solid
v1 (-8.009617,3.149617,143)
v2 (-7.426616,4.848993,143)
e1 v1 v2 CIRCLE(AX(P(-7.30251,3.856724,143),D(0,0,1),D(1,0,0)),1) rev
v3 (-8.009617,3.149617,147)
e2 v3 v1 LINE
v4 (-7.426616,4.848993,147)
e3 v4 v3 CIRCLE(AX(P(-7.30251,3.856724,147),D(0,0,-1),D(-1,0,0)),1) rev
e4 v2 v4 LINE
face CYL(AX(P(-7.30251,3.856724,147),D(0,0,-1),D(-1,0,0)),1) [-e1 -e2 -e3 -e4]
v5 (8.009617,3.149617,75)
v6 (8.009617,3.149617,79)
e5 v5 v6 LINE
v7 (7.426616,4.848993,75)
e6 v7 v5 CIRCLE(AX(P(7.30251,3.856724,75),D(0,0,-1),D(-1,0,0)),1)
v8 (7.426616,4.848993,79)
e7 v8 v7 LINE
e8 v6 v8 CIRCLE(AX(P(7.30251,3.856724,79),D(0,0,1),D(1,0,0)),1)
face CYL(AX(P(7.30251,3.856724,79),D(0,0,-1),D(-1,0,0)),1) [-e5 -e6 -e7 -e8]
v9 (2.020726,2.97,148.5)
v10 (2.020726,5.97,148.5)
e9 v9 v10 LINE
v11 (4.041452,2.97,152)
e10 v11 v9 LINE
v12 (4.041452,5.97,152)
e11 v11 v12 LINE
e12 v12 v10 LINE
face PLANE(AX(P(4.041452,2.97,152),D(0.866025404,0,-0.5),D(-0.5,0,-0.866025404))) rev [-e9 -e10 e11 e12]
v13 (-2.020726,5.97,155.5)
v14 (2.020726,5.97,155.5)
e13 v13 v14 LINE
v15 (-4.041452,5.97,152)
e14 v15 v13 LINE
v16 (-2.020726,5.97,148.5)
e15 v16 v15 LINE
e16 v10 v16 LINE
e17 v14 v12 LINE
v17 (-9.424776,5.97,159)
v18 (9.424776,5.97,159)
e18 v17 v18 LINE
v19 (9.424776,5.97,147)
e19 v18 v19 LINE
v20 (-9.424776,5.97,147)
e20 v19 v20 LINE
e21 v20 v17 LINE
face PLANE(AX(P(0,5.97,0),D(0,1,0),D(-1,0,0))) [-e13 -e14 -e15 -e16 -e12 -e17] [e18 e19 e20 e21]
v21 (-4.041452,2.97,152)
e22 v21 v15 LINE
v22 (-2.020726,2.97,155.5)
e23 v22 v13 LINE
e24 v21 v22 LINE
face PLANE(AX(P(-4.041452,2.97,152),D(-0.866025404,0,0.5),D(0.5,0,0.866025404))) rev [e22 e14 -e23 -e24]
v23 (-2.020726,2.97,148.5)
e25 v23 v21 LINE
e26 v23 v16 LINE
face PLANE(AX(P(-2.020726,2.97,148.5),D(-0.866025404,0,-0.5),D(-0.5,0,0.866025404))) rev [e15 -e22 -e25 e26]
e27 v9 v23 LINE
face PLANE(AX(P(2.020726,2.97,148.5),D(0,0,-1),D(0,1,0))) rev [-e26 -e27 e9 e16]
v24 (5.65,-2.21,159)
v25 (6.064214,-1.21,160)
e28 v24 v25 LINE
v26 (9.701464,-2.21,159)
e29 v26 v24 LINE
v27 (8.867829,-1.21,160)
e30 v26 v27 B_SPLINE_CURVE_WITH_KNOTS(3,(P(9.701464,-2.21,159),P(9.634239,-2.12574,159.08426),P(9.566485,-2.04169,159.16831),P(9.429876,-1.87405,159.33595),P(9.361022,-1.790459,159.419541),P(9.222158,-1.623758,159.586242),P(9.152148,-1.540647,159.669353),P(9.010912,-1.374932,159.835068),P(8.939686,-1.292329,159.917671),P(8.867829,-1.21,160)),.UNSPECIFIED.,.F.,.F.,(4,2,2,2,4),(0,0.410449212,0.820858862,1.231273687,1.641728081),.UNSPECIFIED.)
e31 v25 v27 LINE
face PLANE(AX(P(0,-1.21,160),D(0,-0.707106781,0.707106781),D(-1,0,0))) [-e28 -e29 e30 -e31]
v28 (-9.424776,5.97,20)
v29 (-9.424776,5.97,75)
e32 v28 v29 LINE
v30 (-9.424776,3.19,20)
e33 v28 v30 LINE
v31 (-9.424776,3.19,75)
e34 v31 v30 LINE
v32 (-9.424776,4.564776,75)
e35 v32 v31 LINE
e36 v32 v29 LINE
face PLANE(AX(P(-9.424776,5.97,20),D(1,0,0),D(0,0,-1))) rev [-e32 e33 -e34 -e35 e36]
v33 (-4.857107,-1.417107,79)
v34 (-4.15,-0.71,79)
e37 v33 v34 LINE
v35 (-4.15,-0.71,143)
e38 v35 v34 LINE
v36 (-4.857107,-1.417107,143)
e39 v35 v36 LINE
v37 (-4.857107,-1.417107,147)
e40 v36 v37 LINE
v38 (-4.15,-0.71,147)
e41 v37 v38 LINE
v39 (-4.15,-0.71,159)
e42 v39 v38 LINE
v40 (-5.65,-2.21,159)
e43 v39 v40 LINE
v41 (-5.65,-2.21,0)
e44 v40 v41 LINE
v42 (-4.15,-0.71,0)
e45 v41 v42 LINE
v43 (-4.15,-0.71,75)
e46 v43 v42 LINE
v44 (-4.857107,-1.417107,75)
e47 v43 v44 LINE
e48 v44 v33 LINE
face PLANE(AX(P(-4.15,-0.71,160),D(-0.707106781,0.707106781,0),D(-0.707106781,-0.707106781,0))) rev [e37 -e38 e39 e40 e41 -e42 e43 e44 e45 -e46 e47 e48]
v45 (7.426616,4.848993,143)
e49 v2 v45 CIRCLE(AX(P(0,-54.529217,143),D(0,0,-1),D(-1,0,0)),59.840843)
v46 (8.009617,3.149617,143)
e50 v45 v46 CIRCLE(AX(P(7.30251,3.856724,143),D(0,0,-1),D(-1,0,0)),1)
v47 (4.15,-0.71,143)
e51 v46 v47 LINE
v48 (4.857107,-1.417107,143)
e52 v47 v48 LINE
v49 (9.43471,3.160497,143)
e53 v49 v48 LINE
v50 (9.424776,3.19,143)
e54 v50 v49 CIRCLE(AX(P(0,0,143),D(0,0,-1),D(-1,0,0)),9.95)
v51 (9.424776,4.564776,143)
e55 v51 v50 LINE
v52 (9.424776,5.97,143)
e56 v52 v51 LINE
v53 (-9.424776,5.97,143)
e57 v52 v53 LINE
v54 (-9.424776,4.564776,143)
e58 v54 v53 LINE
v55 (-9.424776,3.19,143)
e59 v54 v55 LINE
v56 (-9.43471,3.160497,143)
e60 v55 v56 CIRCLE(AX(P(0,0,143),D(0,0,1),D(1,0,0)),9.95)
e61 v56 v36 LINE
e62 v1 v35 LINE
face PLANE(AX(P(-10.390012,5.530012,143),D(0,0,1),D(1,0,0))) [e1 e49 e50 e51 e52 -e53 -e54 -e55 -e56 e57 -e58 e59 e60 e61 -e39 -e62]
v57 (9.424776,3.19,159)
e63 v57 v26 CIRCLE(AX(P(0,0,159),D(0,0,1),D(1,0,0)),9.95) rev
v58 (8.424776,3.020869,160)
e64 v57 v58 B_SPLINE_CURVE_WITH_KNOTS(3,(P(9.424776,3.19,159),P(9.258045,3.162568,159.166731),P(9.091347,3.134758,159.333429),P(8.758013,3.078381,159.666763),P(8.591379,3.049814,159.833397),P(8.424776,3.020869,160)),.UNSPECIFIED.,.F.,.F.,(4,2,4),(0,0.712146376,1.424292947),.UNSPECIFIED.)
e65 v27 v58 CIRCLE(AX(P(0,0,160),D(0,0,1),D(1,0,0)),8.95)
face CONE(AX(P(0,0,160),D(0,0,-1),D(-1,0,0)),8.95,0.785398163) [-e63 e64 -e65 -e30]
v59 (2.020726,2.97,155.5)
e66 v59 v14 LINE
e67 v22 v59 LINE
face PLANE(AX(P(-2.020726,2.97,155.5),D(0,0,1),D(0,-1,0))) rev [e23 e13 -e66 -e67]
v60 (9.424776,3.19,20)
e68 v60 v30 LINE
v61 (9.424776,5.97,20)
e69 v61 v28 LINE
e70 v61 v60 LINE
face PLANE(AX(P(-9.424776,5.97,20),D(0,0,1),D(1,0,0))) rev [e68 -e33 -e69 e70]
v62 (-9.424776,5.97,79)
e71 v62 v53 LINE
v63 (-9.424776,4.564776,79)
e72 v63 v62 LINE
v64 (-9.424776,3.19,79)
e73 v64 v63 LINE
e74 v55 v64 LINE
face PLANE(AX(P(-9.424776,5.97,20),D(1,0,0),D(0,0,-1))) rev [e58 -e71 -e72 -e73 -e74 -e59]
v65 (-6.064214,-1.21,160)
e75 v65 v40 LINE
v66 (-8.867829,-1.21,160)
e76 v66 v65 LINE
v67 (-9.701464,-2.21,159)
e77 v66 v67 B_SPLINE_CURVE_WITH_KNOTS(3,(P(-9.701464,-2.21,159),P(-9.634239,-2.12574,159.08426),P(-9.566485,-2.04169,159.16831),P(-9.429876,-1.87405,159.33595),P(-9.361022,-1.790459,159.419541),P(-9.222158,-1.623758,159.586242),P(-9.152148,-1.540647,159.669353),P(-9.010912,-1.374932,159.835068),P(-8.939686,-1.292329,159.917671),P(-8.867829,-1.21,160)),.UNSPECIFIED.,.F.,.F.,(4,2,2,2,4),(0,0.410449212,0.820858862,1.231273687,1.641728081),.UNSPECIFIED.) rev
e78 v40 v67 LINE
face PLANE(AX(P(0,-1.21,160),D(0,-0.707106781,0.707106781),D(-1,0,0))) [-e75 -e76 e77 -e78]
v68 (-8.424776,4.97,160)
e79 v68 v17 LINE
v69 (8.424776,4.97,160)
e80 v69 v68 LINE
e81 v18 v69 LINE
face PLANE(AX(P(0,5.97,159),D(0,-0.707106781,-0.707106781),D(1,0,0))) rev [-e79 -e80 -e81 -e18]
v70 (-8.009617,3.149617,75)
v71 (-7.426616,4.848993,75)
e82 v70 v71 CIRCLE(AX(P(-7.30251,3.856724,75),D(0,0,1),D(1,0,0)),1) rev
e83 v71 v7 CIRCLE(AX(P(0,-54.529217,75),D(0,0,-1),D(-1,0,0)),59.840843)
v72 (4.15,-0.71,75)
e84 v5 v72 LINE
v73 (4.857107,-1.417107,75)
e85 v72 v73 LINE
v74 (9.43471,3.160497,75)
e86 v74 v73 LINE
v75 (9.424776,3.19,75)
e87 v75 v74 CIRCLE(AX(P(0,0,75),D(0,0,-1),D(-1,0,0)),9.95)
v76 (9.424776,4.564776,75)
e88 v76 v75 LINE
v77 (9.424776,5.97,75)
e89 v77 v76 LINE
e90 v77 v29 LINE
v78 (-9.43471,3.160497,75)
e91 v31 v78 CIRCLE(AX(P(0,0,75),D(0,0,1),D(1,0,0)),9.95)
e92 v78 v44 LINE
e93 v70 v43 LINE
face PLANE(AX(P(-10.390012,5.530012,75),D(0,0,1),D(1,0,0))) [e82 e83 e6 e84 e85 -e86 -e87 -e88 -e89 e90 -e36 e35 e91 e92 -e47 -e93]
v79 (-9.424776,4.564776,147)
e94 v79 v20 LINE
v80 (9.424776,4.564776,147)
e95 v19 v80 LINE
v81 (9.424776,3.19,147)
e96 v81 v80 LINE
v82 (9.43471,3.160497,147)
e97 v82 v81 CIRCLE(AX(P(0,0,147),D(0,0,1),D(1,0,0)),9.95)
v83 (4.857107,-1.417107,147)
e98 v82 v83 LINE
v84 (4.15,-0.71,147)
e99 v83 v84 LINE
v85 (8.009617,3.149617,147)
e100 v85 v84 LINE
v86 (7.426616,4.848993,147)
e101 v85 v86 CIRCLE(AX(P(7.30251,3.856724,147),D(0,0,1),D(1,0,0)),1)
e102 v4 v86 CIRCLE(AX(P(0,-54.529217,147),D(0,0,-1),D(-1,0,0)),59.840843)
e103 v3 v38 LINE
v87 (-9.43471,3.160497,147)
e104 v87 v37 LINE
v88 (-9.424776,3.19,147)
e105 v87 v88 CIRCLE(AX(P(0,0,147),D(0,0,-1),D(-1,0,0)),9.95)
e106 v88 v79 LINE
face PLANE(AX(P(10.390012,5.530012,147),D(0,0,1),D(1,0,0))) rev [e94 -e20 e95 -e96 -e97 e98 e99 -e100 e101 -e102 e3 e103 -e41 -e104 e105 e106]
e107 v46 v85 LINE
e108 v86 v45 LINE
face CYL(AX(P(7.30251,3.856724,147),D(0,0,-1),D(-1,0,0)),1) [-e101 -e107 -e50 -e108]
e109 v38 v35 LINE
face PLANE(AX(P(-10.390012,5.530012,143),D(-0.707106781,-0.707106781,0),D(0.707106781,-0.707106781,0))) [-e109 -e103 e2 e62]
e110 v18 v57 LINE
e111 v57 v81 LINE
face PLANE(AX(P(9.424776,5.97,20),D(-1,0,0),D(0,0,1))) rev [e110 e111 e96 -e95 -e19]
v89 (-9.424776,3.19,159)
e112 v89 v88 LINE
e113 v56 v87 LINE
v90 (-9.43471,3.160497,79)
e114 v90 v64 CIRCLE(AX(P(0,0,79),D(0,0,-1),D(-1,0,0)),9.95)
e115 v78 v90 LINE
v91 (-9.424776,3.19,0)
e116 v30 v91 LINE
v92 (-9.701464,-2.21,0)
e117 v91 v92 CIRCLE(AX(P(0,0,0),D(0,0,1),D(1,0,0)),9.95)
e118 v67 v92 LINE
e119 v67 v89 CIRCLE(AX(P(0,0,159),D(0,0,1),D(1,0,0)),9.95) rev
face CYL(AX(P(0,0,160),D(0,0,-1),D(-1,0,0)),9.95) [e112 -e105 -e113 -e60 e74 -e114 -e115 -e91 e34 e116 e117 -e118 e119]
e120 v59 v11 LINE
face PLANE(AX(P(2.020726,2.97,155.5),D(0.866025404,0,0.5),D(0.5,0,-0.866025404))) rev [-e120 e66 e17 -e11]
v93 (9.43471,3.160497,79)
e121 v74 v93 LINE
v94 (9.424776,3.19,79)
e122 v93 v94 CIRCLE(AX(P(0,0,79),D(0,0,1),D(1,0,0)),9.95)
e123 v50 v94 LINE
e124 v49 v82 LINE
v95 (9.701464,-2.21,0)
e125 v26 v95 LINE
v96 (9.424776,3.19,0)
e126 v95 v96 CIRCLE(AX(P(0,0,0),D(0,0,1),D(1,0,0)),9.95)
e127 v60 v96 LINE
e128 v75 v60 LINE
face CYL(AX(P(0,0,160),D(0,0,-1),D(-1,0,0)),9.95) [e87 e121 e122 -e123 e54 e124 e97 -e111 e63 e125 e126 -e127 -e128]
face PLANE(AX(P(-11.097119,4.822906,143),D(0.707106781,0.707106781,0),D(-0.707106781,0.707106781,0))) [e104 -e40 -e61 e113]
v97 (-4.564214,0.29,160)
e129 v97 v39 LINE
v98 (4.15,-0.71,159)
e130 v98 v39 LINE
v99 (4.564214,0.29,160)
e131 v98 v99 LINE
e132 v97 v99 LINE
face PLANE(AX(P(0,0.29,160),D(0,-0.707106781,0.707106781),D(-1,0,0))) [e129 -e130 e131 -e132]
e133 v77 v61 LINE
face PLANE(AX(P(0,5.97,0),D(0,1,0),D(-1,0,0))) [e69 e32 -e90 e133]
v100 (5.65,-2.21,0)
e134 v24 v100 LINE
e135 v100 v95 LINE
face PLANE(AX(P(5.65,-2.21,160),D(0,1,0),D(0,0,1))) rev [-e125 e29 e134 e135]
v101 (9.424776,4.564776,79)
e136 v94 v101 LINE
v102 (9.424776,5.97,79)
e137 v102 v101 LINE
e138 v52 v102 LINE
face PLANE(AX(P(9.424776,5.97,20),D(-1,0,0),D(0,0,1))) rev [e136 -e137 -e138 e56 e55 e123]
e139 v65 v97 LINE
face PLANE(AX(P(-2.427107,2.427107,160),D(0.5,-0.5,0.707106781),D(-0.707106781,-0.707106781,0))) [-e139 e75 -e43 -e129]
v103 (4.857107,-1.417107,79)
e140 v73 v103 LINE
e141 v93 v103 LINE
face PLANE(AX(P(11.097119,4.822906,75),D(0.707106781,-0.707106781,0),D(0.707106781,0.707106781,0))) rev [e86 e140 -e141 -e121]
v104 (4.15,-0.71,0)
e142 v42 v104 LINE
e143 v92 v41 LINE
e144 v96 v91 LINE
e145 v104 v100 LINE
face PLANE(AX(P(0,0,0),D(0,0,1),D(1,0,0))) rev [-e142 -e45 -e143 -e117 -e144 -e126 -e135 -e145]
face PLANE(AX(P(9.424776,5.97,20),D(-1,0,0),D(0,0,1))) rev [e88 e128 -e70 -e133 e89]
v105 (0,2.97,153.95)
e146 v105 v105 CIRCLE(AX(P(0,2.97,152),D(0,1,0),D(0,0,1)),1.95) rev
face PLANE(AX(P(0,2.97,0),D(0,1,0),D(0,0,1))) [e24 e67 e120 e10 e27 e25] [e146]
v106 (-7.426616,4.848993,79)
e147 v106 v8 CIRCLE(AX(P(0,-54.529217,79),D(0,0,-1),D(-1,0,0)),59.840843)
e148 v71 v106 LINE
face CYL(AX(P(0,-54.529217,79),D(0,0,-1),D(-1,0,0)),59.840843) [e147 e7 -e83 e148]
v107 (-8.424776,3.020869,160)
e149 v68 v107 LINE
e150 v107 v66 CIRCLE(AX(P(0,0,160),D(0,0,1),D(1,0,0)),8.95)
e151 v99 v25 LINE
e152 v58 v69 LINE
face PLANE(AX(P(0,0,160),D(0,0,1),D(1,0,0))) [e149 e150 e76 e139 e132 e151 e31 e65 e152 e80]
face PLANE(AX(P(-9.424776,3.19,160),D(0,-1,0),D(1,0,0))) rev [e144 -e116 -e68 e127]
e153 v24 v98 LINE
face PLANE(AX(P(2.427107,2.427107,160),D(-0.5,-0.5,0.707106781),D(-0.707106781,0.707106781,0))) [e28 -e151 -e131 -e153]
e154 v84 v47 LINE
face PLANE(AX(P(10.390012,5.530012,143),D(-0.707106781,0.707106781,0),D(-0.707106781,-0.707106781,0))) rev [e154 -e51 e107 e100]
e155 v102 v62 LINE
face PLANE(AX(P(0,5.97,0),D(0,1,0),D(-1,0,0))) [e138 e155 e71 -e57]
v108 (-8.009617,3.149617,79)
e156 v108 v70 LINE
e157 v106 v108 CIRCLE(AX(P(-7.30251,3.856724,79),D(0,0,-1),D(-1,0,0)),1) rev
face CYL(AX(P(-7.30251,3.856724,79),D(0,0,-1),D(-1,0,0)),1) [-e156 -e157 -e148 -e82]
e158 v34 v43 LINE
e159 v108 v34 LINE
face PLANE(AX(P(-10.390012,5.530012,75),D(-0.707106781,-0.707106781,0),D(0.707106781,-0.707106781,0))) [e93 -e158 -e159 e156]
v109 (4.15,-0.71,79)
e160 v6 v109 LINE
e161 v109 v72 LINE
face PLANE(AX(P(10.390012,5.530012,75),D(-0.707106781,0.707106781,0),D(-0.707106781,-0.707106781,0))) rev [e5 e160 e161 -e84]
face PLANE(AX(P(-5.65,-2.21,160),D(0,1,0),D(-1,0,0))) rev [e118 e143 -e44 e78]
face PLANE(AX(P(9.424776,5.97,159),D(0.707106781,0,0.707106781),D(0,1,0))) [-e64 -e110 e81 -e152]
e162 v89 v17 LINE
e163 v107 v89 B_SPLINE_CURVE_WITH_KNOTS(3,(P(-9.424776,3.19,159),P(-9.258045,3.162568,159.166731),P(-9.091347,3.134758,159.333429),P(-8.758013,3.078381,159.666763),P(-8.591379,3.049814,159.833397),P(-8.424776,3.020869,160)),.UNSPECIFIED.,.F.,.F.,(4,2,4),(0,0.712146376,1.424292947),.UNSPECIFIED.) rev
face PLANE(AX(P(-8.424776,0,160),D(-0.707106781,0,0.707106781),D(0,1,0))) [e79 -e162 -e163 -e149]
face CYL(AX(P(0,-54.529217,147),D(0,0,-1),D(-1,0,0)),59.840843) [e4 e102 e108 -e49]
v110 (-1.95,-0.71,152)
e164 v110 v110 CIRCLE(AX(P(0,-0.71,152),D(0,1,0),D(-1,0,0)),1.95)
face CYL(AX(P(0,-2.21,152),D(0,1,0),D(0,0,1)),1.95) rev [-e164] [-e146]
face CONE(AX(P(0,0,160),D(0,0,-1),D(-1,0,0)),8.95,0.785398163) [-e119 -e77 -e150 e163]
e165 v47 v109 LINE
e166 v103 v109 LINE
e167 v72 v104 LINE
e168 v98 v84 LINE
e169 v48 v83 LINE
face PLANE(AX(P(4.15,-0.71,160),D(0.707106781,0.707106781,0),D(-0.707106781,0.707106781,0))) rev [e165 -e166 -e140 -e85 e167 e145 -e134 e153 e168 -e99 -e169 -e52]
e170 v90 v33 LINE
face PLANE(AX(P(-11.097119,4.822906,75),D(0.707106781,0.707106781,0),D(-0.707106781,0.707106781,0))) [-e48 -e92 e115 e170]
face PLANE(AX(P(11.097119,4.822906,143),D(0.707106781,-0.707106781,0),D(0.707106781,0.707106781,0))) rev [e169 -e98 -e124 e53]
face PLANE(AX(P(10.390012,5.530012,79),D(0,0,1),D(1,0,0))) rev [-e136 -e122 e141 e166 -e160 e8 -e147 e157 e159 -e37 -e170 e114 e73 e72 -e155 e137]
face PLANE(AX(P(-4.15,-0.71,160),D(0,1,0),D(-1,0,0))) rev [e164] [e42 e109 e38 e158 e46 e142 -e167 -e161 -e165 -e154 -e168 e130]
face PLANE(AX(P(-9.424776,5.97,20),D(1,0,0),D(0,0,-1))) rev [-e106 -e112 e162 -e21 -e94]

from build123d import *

# Parameters (mm, degrees)
EXTRUDE_1_DEPTH                  = 160
SKETCH_4_W                       = 18.849551718
SKETCH_4_H                       = 140
EXTRUDE_2_DEPTH                  = 2.78
CUT_EXTRUDE_2_DEPTH              = 161.420208827
CUT_EXTRUDE_2_DEPTH_BACK         = 161.420208827
SKETCH_5_R                       = 1.95
CUT_EXTRUDE_3_DEPTH              = 3
CHAMFER_1_SIZE                   = 1
SKETCH_8_W                       = 4
SKETCH_8_H                       = 1
CUT_EXTRUDE_4_DEPTH              = 161.481311685
CUT_EXTRUDE_5_DEPTH              = 4
FILLET_1_R                       = 1
PATTERN_LINEAR_1_COUNT           = 2
PATTERN_LINEAR_1_PITCH           = 68
PATTERN_LINEAR_1_COPY_1_SKETCH_W = 4
PATTERN_LINEAR_1_COPY_1_SKETCH_H = 1
PATTERN_LINEAR_1_COPY_1_DEPTH    = 161.481311685
FILLET_1_OF_PATTERN_LINEAR_1_R   = 1


with BuildPart() as part:
    # 스케치1 → 보스-돌출1 (new body)
    with BuildSketch(Plane.XY):
        with BuildLine():
            Line((-9.424775859, 3.19), (9.424775859, 3.19))
            ThreePointArc((9.424775859, 3.19), (9.936964373, 0.509155237), (9.701463807, -2.21))
            Line((9.701463807, -2.21), (5.65, -2.21))
            Line((5.65, -2.21), (4.15, -0.71))
            Line((4.15, -0.71), (-4.15, -0.71))
            Line((-4.15, -0.71), (-5.65, -2.21))
            Line((-5.65, -2.21), (-9.701463807, -2.21))
            ThreePointArc((-9.701463807, -2.21), (-9.936964373, 0.509155237), (-9.424775859, 3.19))
        make_face()
    extrude(amount=EXTRUDE_1_DEPTH)

    # 스케치4 → 보스-돌출2 (add)
    with BuildSketch(Plane(origin=(0, 3.19, 0), x_dir=(1, 0, 0), z_dir=(0, 1, 0))):
        with Locations((0, -90)):
            Rectangle(SKETCH_4_W, SKETCH_4_H)
    extrude(amount=EXTRUDE_2_DEPTH)

    # 스케치5 → 컷-돌출2 (cut, two sides: drawn at the far end of the back side and taken through both)
    with BuildSketch(Plane(origin=(0, 0, 0), x_dir=(1, 0, 0), z_dir=(0, 1, 0)).offset(-CUT_EXTRUDE_2_DEPTH_BACK)):
        with Locations(Location((0, -152, 0), (0, 0, 180))):
            Circle(SKETCH_5_R)
    extrude(amount=CUT_EXTRUDE_2_DEPTH + CUT_EXTRUDE_2_DEPTH_BACK, mode=Mode.SUBTRACT)

    # 스케치6 → 컷-돌출3 (cut)
    with BuildSketch(Plane(origin=(0, 5.97, 0), x_dir=(1, 0, 0), z_dir=(0, 1, 0))):
        Polygon((4.041451884, -152), (2.020725942, -148.5), (-2.020725942, -148.5), (-4.041451884, -152), (-2.020725942, -155.5), (2.020725942, -155.5), align=None)
    extrude(amount=-CUT_EXTRUDE_3_DEPTH, mode=Mode.SUBTRACT)

    # 모따기1
    chamfer_1_edges = [part.edges().sort_by_distance(p)[0] for p in [
        (0, -0.71, 160),
        (-4.9, -1.46, 160),
        (-7.675731904, -2.21, 160),
        (-9.936964373, 0.509155237, 160),
        (-9.424775859, 4.58, 160),
        (0, 5.97, 160),
        (9.424775859, 4.58, 160),
        (9.936964373, 0.509155237, 160),
        (7.675731904, -2.21, 160),
        (4.9, -1.46, 160),
    ]]
    chamfer(chamfer_1_edges, length=CHAMFER_1_SIZE)

    # 스케치8 → 컷-돌출4 (cut, through all)
    with BuildSketch(Plane(origin=(1.72, 1.72, 0), x_dir=(0, 0, 1), z_dir=(-0.7071067811865488, -0.7071067811865464, 0))):
        with Locations((77, -3.936538957)):
            Rectangle(SKETCH_8_W, SKETCH_8_H)
    cut_extrude_4 = extrude(amount=-CUT_EXTRUDE_4_DEPTH, mode=Mode.SUBTRACT)

    # 대칭 복사1: 컷-돌출4 across plane
    add(cut_extrude_4.mirror(Plane(origin=(0, 0, 0), x_dir=(0, 0, 1), z_dir=(1, 0, 0))), mode=Mode.SUBTRACT)

    # 스케치9 → 컷-돌출5 (cut)
    with BuildSketch(Plane.XY.offset(75)):
        with BuildLine():
            Line((-9.424775859, 4.564775859), (-13.291839, 9.783941573))
            Line((-13.291839, 9.783941573), (12.328532893, 9.783941573))
            Line((12.328532893, 9.783941573), (9.424775859, 4.564775859))
            ThreePointArc((9.424775859, 4.564775859), (0, 5.311625169), (-9.424775859, 4.564775859))
        make_face()
    cut_extrude_5 = extrude(amount=CUT_EXTRUDE_5_DEPTH, mode=Mode.SUBTRACT)

    # 필렛1
    # the kernel refuses this fillet: 1 mm, written as the material it takes off along each edge
    with BuildSketch(Plane(origin=(9.424775859, 4.564775859, 79), x_dir=(-0.7071067811865487, -0.7071067811865465, 0), z_dir=(0, 0, -1))) as fillet_1_piece_1:
        with BuildLine():
            CenterArc((2.001337163, 1), FILLET_1_R, 142.129139592, 127.870860408)
            ThreePointArc((1.211940766, 1.613883807), (0.5991659, 0.812051708), (0, 0))
            Line((0, 0), (2.001337163, 0))
        make_face()
    extrude(amount=4, mode=Mode.SUBTRACT)
    with BuildSketch(Plane(origin=(-9.424775859, 4.564775859, 79), x_dir=(0.7071067811865489, -0.7071067811865462, 0), z_dir=(0, 0, -1))) as fillet_1_piece_2:
        with BuildLine():
            CenterArc((2.001337163, -1), FILLET_1_R, 90, 127.870860408)
            ThreePointArc((1.211940766, -1.613883807), (0.5991659, -0.812051708), (0, 0))
            Line((0, 0), (2.001337163, 0))
        make_face()
    extrude(amount=4, mode=Mode.SUBTRACT)

    # 선형 패턴1: 컷-돌출4, 컷-돌출5 ×2
    with Locations(*[(0, 0, i * PATTERN_LINEAR_1_PITCH) for i in range(1, PATTERN_LINEAR_1_COUNT)]):
        add(cut_extrude_4, mode=Mode.SUBTRACT)
        add(cut_extrude_5, mode=Mode.SUBTRACT)

    # 선형 패턴1 copy 1 sketch → 선형 패턴1 copy 1 (cut, through all)
    with BuildSketch(Plane(origin=(-1.72, 1.72, 68), x_dir=(0, 0, 1), z_dir=(0.7071067811865488, -0.7071067811865464, 0))):
        with Locations((77, 3.936538957)):
            Rectangle(PATTERN_LINEAR_1_COPY_1_SKETCH_W, PATTERN_LINEAR_1_COPY_1_SKETCH_H)
    extrude(amount=-PATTERN_LINEAR_1_COPY_1_DEPTH, mode=Mode.SUBTRACT)

    # 필렛1 of 선형 패턴1
    # the kernel refuses this fillet: 1 mm, written as the material it takes off along each edge
    with BuildSketch(Plane(origin=(9.424775859, 4.564775859, 147), x_dir=(-0.7071067811865485, -0.7071067811865467, 0), z_dir=(0, 0, -1)), Plane(origin=(-9.424775859, 4.564775859, 143), x_dir=(0.707106781186548, -0.7071067811865471, 0), z_dir=(0, 0, 1))) as fillet_1_of_pattern_linear_1_piece_1:
        with BuildLine():
            CenterArc((2.001337163, 1), FILLET_1_OF_PATTERN_LINEAR_1_R, 142.129139592, 127.870860408)
            ThreePointArc((1.211940766, 1.613883807), (0.5991659, 0.812051708), (0, 0))
            Line((0, 0), (2.001337163, 0))
        make_face()
    extrude(amount=4, mode=Mode.SUBTRACT)


solid = part.part
